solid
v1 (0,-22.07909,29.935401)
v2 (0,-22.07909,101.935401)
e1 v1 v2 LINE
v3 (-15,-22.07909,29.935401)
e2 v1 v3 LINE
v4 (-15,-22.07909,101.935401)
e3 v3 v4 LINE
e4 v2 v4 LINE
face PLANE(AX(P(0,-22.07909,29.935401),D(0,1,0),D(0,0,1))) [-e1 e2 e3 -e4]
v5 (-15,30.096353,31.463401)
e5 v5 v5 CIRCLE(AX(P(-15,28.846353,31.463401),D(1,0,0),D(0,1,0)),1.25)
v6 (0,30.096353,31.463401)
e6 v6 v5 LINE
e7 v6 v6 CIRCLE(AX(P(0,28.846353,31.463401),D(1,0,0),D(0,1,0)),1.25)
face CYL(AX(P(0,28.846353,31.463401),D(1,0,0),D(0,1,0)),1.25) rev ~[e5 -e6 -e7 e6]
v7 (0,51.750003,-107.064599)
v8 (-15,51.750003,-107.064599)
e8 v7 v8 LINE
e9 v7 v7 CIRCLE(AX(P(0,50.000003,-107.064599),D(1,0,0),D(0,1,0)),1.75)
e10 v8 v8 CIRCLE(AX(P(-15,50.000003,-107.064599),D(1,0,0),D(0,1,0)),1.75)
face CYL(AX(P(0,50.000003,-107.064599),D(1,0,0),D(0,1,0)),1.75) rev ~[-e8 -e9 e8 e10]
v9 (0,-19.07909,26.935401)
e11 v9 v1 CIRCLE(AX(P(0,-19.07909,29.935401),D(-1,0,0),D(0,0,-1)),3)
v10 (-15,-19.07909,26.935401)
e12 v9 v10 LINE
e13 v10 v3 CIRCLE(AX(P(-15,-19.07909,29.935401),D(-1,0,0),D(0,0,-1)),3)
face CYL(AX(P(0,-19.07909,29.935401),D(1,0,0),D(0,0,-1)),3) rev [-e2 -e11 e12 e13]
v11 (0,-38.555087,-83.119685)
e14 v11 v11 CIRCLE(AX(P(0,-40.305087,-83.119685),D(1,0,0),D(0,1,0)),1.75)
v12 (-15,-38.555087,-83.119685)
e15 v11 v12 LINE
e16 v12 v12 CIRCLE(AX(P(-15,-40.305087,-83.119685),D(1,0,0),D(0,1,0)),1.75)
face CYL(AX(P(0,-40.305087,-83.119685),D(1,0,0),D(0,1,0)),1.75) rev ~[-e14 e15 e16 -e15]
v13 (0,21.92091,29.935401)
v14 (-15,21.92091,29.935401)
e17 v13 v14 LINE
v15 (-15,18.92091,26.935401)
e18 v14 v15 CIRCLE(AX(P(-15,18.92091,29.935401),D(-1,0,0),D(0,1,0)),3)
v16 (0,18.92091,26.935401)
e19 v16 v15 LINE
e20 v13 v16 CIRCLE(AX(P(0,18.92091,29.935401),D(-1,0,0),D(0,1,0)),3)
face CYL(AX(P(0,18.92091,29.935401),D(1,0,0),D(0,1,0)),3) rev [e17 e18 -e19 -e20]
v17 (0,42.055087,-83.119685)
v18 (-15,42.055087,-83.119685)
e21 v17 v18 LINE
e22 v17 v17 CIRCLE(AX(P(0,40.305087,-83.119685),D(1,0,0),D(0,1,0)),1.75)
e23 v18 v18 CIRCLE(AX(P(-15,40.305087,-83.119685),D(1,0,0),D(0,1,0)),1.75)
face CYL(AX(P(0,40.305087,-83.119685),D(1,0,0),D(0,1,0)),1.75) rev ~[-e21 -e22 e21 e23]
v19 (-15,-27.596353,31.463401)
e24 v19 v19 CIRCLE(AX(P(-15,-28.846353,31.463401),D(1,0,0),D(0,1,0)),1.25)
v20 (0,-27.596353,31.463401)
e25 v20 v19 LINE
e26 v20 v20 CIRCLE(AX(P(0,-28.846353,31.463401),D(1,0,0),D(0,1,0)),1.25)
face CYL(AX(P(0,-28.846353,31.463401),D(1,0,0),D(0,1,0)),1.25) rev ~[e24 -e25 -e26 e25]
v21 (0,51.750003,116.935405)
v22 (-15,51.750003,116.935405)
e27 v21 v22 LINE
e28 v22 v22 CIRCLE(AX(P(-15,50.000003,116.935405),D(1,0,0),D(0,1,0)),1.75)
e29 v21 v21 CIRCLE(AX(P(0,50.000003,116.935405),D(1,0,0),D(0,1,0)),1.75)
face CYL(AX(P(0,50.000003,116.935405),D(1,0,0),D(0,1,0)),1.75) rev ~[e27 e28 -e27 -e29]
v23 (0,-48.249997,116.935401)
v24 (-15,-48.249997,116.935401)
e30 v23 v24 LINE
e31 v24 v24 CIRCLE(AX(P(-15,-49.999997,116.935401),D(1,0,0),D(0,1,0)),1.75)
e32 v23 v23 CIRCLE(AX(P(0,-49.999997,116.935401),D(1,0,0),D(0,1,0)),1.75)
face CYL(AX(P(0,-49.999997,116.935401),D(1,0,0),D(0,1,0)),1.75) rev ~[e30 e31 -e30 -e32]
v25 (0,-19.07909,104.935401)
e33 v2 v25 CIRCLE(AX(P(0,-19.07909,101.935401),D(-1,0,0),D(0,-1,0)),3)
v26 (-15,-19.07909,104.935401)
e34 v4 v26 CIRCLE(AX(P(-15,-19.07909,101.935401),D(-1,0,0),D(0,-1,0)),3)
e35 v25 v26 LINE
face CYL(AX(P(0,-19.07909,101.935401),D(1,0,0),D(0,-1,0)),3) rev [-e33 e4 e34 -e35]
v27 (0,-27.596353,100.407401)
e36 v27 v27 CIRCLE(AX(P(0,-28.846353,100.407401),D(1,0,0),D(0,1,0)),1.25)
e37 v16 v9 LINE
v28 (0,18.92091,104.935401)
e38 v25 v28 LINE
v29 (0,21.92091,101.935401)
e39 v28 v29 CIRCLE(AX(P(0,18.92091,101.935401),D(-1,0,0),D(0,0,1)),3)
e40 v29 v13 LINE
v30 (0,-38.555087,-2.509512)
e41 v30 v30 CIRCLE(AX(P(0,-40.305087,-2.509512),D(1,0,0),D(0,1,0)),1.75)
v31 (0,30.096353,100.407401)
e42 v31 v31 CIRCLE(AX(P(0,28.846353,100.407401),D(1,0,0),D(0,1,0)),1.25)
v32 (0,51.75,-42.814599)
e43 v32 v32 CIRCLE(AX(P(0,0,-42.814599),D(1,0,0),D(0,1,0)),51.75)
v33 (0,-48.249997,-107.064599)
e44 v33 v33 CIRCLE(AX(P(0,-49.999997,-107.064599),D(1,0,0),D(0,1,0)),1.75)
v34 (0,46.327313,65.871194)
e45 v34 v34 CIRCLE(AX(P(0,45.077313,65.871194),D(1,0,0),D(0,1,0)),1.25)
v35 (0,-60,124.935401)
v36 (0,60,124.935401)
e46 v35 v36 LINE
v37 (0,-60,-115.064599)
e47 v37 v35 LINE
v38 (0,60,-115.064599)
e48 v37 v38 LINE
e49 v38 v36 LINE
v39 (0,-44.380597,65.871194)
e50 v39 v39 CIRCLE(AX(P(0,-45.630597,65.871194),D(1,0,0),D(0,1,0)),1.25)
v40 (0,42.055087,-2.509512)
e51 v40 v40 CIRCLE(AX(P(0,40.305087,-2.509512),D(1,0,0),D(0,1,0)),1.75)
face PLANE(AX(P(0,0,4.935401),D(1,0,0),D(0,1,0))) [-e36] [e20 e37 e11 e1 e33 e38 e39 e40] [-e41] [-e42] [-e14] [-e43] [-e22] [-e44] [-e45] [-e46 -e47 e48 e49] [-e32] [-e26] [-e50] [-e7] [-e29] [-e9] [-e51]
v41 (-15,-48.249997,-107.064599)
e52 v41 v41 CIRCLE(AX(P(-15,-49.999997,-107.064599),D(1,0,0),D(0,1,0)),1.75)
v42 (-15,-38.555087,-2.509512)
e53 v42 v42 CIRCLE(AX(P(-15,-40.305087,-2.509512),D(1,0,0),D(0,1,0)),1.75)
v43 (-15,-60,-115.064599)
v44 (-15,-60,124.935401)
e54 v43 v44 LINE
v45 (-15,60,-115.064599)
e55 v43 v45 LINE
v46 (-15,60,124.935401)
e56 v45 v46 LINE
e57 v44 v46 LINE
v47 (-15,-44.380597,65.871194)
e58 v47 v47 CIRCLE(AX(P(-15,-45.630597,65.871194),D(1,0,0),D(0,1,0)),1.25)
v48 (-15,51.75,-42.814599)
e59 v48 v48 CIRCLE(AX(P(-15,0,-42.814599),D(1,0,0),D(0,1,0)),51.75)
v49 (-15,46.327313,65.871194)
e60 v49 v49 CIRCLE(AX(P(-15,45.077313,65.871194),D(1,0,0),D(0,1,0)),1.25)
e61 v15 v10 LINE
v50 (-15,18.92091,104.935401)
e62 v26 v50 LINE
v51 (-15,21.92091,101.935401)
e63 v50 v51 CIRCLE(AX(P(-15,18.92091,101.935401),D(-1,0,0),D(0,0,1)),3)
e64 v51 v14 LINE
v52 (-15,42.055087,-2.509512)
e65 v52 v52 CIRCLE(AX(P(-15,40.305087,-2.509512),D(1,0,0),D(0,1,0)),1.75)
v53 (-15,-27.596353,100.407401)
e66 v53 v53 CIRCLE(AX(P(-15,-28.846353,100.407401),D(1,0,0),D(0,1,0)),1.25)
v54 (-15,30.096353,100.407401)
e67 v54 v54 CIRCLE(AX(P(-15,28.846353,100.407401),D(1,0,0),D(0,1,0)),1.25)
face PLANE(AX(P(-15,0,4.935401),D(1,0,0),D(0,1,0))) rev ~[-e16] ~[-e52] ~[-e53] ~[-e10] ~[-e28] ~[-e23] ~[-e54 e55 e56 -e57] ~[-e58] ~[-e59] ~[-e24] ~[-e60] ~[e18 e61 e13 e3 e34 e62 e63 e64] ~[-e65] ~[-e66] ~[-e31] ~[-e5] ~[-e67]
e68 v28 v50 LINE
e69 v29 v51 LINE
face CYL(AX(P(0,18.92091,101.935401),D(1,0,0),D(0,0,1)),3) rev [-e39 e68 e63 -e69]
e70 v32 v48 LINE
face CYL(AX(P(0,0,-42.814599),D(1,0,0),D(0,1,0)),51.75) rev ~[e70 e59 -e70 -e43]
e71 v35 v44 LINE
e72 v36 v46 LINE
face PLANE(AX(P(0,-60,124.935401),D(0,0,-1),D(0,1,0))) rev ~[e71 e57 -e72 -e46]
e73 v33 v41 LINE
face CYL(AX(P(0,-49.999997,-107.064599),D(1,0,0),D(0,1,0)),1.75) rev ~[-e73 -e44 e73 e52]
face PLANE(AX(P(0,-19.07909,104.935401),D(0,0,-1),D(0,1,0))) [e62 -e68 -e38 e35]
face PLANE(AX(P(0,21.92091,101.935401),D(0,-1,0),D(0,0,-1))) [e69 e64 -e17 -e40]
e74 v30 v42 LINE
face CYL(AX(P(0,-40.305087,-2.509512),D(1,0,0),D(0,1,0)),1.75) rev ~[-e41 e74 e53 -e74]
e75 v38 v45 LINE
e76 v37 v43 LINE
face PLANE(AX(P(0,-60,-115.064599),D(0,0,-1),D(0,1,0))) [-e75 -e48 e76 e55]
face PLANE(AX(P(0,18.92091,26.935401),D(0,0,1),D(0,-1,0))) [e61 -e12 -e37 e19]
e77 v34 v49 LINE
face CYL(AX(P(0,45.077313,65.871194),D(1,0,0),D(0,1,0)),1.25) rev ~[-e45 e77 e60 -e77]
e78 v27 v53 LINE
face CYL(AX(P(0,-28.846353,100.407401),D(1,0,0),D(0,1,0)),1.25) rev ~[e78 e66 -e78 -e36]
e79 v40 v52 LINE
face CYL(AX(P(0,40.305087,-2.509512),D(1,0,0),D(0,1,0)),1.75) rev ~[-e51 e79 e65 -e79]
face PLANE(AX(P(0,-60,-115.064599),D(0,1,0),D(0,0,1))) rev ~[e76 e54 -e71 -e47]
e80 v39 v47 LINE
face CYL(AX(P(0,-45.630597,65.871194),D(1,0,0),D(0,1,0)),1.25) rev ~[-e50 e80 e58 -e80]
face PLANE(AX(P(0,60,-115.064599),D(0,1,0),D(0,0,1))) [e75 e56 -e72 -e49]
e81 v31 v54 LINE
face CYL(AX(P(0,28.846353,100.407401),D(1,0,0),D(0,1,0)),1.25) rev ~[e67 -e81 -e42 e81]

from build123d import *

# Parameters (mm, degrees)
F0_W     = 120
F0_H     = 240
F0_R     = 1.75
F0_R_2   = 51.75
F0_R_3   = 1.25
F1_DEPTH = 15


# Not quite as in the source:
# - a feature names something its author has since deleted; it is built from what else it names


with BuildPart() as f1:
    # F0 (on Right) → F1 (new body)
    with BuildSketch(Plane.YZ):
        with Locations((0, 4.9354011911)):
            Rectangle(F0_W, F0_H)
        with Locations((-49.9999973178, -107.0645988089)):
            Circle(F0_R, mode=Mode.SUBTRACT)
        with Locations((-40.3050865276, -83.1196853366)):
            Circle(F0_R, mode=Mode.SUBTRACT)
        with Locations((-40.3050865276, -2.5095122813)):
            Circle(F0_R, mode=Mode.SUBTRACT)
        with Locations((50.0000026822, -107.0645988089)):
            Circle(F0_R, mode=Mode.SUBTRACT)
        with Locations((40.3050865276, -83.1196853366)):
            Circle(F0_R, mode=Mode.SUBTRACT)
        with Locations((0, -42.8145988089)):
            Circle(F0_R_2, mode=Mode.SUBTRACT)
        with Locations((40.3050865276, -2.5095122813)):
            Circle(F0_R, mode=Mode.SUBTRACT)
        with Locations((-28.8463527312, 31.4634012507)):
            Circle(F0_R_3, mode=Mode.SUBTRACT)
        with Locations((-45.6305965781, 65.8711940348)):
            Circle(F0_R_3, mode=Mode.SUBTRACT)
        with Locations((-49.9999973178, 116.9354011911)):
            Circle(F0_R, mode=Mode.SUBTRACT)
        with BuildLine():
            ThreePointArc((-22.0790897047, 101.9354011911), (-21.2004100483, 104.0567215346), (-19.0790897047, 104.9354011911))
            Line((-19.0790897047, 104.9354011911), (18.9209102953, 104.9354011911))
            ThreePointArc((18.9209102953, 104.9354011911), (21.0422306388, 104.0567215346), (21.9209102953, 101.9354011911))
            Line((21.9209102953, 101.9354011911), (21.9209102953, 29.9354011911))
            ThreePointArc((21.9209102953, 29.9354011911), (21.0422306388, 27.8140808475), (18.9209102953, 26.9354011911))
            Line((18.9209102953, 26.9354011911), (-19.0790897047, 26.9354011911))
            ThreePointArc((-19.0790897047, 26.9354011911), (-21.2004100483, 27.8140808475), (-22.0790897047, 29.9354011911))
            Line((-22.0790897047, 29.9354011911), (-22.0790897047, 101.9354011911))
        make_face(mode=Mode.SUBTRACT)
        with Locations((-28.8463527312, 100.4074011314)):
            Circle(F0_R_3, mode=Mode.SUBTRACT)
        with Locations((28.8463527312, 31.4634012507)):
            Circle(F0_R_3, mode=Mode.SUBTRACT)
        with Locations((28.8463527312, 100.4074011314)):
            Circle(F0_R_3, mode=Mode.SUBTRACT)
        with Locations((45.0773127377, 65.8711940348)):
            Circle(F0_R_3, mode=Mode.SUBTRACT)
        with Locations((50.0000026822, 116.9354046481)):
            Circle(F0_R, mode=Mode.SUBTRACT)
    extrude(amount=-F1_DEPTH)


solid = f1.part
